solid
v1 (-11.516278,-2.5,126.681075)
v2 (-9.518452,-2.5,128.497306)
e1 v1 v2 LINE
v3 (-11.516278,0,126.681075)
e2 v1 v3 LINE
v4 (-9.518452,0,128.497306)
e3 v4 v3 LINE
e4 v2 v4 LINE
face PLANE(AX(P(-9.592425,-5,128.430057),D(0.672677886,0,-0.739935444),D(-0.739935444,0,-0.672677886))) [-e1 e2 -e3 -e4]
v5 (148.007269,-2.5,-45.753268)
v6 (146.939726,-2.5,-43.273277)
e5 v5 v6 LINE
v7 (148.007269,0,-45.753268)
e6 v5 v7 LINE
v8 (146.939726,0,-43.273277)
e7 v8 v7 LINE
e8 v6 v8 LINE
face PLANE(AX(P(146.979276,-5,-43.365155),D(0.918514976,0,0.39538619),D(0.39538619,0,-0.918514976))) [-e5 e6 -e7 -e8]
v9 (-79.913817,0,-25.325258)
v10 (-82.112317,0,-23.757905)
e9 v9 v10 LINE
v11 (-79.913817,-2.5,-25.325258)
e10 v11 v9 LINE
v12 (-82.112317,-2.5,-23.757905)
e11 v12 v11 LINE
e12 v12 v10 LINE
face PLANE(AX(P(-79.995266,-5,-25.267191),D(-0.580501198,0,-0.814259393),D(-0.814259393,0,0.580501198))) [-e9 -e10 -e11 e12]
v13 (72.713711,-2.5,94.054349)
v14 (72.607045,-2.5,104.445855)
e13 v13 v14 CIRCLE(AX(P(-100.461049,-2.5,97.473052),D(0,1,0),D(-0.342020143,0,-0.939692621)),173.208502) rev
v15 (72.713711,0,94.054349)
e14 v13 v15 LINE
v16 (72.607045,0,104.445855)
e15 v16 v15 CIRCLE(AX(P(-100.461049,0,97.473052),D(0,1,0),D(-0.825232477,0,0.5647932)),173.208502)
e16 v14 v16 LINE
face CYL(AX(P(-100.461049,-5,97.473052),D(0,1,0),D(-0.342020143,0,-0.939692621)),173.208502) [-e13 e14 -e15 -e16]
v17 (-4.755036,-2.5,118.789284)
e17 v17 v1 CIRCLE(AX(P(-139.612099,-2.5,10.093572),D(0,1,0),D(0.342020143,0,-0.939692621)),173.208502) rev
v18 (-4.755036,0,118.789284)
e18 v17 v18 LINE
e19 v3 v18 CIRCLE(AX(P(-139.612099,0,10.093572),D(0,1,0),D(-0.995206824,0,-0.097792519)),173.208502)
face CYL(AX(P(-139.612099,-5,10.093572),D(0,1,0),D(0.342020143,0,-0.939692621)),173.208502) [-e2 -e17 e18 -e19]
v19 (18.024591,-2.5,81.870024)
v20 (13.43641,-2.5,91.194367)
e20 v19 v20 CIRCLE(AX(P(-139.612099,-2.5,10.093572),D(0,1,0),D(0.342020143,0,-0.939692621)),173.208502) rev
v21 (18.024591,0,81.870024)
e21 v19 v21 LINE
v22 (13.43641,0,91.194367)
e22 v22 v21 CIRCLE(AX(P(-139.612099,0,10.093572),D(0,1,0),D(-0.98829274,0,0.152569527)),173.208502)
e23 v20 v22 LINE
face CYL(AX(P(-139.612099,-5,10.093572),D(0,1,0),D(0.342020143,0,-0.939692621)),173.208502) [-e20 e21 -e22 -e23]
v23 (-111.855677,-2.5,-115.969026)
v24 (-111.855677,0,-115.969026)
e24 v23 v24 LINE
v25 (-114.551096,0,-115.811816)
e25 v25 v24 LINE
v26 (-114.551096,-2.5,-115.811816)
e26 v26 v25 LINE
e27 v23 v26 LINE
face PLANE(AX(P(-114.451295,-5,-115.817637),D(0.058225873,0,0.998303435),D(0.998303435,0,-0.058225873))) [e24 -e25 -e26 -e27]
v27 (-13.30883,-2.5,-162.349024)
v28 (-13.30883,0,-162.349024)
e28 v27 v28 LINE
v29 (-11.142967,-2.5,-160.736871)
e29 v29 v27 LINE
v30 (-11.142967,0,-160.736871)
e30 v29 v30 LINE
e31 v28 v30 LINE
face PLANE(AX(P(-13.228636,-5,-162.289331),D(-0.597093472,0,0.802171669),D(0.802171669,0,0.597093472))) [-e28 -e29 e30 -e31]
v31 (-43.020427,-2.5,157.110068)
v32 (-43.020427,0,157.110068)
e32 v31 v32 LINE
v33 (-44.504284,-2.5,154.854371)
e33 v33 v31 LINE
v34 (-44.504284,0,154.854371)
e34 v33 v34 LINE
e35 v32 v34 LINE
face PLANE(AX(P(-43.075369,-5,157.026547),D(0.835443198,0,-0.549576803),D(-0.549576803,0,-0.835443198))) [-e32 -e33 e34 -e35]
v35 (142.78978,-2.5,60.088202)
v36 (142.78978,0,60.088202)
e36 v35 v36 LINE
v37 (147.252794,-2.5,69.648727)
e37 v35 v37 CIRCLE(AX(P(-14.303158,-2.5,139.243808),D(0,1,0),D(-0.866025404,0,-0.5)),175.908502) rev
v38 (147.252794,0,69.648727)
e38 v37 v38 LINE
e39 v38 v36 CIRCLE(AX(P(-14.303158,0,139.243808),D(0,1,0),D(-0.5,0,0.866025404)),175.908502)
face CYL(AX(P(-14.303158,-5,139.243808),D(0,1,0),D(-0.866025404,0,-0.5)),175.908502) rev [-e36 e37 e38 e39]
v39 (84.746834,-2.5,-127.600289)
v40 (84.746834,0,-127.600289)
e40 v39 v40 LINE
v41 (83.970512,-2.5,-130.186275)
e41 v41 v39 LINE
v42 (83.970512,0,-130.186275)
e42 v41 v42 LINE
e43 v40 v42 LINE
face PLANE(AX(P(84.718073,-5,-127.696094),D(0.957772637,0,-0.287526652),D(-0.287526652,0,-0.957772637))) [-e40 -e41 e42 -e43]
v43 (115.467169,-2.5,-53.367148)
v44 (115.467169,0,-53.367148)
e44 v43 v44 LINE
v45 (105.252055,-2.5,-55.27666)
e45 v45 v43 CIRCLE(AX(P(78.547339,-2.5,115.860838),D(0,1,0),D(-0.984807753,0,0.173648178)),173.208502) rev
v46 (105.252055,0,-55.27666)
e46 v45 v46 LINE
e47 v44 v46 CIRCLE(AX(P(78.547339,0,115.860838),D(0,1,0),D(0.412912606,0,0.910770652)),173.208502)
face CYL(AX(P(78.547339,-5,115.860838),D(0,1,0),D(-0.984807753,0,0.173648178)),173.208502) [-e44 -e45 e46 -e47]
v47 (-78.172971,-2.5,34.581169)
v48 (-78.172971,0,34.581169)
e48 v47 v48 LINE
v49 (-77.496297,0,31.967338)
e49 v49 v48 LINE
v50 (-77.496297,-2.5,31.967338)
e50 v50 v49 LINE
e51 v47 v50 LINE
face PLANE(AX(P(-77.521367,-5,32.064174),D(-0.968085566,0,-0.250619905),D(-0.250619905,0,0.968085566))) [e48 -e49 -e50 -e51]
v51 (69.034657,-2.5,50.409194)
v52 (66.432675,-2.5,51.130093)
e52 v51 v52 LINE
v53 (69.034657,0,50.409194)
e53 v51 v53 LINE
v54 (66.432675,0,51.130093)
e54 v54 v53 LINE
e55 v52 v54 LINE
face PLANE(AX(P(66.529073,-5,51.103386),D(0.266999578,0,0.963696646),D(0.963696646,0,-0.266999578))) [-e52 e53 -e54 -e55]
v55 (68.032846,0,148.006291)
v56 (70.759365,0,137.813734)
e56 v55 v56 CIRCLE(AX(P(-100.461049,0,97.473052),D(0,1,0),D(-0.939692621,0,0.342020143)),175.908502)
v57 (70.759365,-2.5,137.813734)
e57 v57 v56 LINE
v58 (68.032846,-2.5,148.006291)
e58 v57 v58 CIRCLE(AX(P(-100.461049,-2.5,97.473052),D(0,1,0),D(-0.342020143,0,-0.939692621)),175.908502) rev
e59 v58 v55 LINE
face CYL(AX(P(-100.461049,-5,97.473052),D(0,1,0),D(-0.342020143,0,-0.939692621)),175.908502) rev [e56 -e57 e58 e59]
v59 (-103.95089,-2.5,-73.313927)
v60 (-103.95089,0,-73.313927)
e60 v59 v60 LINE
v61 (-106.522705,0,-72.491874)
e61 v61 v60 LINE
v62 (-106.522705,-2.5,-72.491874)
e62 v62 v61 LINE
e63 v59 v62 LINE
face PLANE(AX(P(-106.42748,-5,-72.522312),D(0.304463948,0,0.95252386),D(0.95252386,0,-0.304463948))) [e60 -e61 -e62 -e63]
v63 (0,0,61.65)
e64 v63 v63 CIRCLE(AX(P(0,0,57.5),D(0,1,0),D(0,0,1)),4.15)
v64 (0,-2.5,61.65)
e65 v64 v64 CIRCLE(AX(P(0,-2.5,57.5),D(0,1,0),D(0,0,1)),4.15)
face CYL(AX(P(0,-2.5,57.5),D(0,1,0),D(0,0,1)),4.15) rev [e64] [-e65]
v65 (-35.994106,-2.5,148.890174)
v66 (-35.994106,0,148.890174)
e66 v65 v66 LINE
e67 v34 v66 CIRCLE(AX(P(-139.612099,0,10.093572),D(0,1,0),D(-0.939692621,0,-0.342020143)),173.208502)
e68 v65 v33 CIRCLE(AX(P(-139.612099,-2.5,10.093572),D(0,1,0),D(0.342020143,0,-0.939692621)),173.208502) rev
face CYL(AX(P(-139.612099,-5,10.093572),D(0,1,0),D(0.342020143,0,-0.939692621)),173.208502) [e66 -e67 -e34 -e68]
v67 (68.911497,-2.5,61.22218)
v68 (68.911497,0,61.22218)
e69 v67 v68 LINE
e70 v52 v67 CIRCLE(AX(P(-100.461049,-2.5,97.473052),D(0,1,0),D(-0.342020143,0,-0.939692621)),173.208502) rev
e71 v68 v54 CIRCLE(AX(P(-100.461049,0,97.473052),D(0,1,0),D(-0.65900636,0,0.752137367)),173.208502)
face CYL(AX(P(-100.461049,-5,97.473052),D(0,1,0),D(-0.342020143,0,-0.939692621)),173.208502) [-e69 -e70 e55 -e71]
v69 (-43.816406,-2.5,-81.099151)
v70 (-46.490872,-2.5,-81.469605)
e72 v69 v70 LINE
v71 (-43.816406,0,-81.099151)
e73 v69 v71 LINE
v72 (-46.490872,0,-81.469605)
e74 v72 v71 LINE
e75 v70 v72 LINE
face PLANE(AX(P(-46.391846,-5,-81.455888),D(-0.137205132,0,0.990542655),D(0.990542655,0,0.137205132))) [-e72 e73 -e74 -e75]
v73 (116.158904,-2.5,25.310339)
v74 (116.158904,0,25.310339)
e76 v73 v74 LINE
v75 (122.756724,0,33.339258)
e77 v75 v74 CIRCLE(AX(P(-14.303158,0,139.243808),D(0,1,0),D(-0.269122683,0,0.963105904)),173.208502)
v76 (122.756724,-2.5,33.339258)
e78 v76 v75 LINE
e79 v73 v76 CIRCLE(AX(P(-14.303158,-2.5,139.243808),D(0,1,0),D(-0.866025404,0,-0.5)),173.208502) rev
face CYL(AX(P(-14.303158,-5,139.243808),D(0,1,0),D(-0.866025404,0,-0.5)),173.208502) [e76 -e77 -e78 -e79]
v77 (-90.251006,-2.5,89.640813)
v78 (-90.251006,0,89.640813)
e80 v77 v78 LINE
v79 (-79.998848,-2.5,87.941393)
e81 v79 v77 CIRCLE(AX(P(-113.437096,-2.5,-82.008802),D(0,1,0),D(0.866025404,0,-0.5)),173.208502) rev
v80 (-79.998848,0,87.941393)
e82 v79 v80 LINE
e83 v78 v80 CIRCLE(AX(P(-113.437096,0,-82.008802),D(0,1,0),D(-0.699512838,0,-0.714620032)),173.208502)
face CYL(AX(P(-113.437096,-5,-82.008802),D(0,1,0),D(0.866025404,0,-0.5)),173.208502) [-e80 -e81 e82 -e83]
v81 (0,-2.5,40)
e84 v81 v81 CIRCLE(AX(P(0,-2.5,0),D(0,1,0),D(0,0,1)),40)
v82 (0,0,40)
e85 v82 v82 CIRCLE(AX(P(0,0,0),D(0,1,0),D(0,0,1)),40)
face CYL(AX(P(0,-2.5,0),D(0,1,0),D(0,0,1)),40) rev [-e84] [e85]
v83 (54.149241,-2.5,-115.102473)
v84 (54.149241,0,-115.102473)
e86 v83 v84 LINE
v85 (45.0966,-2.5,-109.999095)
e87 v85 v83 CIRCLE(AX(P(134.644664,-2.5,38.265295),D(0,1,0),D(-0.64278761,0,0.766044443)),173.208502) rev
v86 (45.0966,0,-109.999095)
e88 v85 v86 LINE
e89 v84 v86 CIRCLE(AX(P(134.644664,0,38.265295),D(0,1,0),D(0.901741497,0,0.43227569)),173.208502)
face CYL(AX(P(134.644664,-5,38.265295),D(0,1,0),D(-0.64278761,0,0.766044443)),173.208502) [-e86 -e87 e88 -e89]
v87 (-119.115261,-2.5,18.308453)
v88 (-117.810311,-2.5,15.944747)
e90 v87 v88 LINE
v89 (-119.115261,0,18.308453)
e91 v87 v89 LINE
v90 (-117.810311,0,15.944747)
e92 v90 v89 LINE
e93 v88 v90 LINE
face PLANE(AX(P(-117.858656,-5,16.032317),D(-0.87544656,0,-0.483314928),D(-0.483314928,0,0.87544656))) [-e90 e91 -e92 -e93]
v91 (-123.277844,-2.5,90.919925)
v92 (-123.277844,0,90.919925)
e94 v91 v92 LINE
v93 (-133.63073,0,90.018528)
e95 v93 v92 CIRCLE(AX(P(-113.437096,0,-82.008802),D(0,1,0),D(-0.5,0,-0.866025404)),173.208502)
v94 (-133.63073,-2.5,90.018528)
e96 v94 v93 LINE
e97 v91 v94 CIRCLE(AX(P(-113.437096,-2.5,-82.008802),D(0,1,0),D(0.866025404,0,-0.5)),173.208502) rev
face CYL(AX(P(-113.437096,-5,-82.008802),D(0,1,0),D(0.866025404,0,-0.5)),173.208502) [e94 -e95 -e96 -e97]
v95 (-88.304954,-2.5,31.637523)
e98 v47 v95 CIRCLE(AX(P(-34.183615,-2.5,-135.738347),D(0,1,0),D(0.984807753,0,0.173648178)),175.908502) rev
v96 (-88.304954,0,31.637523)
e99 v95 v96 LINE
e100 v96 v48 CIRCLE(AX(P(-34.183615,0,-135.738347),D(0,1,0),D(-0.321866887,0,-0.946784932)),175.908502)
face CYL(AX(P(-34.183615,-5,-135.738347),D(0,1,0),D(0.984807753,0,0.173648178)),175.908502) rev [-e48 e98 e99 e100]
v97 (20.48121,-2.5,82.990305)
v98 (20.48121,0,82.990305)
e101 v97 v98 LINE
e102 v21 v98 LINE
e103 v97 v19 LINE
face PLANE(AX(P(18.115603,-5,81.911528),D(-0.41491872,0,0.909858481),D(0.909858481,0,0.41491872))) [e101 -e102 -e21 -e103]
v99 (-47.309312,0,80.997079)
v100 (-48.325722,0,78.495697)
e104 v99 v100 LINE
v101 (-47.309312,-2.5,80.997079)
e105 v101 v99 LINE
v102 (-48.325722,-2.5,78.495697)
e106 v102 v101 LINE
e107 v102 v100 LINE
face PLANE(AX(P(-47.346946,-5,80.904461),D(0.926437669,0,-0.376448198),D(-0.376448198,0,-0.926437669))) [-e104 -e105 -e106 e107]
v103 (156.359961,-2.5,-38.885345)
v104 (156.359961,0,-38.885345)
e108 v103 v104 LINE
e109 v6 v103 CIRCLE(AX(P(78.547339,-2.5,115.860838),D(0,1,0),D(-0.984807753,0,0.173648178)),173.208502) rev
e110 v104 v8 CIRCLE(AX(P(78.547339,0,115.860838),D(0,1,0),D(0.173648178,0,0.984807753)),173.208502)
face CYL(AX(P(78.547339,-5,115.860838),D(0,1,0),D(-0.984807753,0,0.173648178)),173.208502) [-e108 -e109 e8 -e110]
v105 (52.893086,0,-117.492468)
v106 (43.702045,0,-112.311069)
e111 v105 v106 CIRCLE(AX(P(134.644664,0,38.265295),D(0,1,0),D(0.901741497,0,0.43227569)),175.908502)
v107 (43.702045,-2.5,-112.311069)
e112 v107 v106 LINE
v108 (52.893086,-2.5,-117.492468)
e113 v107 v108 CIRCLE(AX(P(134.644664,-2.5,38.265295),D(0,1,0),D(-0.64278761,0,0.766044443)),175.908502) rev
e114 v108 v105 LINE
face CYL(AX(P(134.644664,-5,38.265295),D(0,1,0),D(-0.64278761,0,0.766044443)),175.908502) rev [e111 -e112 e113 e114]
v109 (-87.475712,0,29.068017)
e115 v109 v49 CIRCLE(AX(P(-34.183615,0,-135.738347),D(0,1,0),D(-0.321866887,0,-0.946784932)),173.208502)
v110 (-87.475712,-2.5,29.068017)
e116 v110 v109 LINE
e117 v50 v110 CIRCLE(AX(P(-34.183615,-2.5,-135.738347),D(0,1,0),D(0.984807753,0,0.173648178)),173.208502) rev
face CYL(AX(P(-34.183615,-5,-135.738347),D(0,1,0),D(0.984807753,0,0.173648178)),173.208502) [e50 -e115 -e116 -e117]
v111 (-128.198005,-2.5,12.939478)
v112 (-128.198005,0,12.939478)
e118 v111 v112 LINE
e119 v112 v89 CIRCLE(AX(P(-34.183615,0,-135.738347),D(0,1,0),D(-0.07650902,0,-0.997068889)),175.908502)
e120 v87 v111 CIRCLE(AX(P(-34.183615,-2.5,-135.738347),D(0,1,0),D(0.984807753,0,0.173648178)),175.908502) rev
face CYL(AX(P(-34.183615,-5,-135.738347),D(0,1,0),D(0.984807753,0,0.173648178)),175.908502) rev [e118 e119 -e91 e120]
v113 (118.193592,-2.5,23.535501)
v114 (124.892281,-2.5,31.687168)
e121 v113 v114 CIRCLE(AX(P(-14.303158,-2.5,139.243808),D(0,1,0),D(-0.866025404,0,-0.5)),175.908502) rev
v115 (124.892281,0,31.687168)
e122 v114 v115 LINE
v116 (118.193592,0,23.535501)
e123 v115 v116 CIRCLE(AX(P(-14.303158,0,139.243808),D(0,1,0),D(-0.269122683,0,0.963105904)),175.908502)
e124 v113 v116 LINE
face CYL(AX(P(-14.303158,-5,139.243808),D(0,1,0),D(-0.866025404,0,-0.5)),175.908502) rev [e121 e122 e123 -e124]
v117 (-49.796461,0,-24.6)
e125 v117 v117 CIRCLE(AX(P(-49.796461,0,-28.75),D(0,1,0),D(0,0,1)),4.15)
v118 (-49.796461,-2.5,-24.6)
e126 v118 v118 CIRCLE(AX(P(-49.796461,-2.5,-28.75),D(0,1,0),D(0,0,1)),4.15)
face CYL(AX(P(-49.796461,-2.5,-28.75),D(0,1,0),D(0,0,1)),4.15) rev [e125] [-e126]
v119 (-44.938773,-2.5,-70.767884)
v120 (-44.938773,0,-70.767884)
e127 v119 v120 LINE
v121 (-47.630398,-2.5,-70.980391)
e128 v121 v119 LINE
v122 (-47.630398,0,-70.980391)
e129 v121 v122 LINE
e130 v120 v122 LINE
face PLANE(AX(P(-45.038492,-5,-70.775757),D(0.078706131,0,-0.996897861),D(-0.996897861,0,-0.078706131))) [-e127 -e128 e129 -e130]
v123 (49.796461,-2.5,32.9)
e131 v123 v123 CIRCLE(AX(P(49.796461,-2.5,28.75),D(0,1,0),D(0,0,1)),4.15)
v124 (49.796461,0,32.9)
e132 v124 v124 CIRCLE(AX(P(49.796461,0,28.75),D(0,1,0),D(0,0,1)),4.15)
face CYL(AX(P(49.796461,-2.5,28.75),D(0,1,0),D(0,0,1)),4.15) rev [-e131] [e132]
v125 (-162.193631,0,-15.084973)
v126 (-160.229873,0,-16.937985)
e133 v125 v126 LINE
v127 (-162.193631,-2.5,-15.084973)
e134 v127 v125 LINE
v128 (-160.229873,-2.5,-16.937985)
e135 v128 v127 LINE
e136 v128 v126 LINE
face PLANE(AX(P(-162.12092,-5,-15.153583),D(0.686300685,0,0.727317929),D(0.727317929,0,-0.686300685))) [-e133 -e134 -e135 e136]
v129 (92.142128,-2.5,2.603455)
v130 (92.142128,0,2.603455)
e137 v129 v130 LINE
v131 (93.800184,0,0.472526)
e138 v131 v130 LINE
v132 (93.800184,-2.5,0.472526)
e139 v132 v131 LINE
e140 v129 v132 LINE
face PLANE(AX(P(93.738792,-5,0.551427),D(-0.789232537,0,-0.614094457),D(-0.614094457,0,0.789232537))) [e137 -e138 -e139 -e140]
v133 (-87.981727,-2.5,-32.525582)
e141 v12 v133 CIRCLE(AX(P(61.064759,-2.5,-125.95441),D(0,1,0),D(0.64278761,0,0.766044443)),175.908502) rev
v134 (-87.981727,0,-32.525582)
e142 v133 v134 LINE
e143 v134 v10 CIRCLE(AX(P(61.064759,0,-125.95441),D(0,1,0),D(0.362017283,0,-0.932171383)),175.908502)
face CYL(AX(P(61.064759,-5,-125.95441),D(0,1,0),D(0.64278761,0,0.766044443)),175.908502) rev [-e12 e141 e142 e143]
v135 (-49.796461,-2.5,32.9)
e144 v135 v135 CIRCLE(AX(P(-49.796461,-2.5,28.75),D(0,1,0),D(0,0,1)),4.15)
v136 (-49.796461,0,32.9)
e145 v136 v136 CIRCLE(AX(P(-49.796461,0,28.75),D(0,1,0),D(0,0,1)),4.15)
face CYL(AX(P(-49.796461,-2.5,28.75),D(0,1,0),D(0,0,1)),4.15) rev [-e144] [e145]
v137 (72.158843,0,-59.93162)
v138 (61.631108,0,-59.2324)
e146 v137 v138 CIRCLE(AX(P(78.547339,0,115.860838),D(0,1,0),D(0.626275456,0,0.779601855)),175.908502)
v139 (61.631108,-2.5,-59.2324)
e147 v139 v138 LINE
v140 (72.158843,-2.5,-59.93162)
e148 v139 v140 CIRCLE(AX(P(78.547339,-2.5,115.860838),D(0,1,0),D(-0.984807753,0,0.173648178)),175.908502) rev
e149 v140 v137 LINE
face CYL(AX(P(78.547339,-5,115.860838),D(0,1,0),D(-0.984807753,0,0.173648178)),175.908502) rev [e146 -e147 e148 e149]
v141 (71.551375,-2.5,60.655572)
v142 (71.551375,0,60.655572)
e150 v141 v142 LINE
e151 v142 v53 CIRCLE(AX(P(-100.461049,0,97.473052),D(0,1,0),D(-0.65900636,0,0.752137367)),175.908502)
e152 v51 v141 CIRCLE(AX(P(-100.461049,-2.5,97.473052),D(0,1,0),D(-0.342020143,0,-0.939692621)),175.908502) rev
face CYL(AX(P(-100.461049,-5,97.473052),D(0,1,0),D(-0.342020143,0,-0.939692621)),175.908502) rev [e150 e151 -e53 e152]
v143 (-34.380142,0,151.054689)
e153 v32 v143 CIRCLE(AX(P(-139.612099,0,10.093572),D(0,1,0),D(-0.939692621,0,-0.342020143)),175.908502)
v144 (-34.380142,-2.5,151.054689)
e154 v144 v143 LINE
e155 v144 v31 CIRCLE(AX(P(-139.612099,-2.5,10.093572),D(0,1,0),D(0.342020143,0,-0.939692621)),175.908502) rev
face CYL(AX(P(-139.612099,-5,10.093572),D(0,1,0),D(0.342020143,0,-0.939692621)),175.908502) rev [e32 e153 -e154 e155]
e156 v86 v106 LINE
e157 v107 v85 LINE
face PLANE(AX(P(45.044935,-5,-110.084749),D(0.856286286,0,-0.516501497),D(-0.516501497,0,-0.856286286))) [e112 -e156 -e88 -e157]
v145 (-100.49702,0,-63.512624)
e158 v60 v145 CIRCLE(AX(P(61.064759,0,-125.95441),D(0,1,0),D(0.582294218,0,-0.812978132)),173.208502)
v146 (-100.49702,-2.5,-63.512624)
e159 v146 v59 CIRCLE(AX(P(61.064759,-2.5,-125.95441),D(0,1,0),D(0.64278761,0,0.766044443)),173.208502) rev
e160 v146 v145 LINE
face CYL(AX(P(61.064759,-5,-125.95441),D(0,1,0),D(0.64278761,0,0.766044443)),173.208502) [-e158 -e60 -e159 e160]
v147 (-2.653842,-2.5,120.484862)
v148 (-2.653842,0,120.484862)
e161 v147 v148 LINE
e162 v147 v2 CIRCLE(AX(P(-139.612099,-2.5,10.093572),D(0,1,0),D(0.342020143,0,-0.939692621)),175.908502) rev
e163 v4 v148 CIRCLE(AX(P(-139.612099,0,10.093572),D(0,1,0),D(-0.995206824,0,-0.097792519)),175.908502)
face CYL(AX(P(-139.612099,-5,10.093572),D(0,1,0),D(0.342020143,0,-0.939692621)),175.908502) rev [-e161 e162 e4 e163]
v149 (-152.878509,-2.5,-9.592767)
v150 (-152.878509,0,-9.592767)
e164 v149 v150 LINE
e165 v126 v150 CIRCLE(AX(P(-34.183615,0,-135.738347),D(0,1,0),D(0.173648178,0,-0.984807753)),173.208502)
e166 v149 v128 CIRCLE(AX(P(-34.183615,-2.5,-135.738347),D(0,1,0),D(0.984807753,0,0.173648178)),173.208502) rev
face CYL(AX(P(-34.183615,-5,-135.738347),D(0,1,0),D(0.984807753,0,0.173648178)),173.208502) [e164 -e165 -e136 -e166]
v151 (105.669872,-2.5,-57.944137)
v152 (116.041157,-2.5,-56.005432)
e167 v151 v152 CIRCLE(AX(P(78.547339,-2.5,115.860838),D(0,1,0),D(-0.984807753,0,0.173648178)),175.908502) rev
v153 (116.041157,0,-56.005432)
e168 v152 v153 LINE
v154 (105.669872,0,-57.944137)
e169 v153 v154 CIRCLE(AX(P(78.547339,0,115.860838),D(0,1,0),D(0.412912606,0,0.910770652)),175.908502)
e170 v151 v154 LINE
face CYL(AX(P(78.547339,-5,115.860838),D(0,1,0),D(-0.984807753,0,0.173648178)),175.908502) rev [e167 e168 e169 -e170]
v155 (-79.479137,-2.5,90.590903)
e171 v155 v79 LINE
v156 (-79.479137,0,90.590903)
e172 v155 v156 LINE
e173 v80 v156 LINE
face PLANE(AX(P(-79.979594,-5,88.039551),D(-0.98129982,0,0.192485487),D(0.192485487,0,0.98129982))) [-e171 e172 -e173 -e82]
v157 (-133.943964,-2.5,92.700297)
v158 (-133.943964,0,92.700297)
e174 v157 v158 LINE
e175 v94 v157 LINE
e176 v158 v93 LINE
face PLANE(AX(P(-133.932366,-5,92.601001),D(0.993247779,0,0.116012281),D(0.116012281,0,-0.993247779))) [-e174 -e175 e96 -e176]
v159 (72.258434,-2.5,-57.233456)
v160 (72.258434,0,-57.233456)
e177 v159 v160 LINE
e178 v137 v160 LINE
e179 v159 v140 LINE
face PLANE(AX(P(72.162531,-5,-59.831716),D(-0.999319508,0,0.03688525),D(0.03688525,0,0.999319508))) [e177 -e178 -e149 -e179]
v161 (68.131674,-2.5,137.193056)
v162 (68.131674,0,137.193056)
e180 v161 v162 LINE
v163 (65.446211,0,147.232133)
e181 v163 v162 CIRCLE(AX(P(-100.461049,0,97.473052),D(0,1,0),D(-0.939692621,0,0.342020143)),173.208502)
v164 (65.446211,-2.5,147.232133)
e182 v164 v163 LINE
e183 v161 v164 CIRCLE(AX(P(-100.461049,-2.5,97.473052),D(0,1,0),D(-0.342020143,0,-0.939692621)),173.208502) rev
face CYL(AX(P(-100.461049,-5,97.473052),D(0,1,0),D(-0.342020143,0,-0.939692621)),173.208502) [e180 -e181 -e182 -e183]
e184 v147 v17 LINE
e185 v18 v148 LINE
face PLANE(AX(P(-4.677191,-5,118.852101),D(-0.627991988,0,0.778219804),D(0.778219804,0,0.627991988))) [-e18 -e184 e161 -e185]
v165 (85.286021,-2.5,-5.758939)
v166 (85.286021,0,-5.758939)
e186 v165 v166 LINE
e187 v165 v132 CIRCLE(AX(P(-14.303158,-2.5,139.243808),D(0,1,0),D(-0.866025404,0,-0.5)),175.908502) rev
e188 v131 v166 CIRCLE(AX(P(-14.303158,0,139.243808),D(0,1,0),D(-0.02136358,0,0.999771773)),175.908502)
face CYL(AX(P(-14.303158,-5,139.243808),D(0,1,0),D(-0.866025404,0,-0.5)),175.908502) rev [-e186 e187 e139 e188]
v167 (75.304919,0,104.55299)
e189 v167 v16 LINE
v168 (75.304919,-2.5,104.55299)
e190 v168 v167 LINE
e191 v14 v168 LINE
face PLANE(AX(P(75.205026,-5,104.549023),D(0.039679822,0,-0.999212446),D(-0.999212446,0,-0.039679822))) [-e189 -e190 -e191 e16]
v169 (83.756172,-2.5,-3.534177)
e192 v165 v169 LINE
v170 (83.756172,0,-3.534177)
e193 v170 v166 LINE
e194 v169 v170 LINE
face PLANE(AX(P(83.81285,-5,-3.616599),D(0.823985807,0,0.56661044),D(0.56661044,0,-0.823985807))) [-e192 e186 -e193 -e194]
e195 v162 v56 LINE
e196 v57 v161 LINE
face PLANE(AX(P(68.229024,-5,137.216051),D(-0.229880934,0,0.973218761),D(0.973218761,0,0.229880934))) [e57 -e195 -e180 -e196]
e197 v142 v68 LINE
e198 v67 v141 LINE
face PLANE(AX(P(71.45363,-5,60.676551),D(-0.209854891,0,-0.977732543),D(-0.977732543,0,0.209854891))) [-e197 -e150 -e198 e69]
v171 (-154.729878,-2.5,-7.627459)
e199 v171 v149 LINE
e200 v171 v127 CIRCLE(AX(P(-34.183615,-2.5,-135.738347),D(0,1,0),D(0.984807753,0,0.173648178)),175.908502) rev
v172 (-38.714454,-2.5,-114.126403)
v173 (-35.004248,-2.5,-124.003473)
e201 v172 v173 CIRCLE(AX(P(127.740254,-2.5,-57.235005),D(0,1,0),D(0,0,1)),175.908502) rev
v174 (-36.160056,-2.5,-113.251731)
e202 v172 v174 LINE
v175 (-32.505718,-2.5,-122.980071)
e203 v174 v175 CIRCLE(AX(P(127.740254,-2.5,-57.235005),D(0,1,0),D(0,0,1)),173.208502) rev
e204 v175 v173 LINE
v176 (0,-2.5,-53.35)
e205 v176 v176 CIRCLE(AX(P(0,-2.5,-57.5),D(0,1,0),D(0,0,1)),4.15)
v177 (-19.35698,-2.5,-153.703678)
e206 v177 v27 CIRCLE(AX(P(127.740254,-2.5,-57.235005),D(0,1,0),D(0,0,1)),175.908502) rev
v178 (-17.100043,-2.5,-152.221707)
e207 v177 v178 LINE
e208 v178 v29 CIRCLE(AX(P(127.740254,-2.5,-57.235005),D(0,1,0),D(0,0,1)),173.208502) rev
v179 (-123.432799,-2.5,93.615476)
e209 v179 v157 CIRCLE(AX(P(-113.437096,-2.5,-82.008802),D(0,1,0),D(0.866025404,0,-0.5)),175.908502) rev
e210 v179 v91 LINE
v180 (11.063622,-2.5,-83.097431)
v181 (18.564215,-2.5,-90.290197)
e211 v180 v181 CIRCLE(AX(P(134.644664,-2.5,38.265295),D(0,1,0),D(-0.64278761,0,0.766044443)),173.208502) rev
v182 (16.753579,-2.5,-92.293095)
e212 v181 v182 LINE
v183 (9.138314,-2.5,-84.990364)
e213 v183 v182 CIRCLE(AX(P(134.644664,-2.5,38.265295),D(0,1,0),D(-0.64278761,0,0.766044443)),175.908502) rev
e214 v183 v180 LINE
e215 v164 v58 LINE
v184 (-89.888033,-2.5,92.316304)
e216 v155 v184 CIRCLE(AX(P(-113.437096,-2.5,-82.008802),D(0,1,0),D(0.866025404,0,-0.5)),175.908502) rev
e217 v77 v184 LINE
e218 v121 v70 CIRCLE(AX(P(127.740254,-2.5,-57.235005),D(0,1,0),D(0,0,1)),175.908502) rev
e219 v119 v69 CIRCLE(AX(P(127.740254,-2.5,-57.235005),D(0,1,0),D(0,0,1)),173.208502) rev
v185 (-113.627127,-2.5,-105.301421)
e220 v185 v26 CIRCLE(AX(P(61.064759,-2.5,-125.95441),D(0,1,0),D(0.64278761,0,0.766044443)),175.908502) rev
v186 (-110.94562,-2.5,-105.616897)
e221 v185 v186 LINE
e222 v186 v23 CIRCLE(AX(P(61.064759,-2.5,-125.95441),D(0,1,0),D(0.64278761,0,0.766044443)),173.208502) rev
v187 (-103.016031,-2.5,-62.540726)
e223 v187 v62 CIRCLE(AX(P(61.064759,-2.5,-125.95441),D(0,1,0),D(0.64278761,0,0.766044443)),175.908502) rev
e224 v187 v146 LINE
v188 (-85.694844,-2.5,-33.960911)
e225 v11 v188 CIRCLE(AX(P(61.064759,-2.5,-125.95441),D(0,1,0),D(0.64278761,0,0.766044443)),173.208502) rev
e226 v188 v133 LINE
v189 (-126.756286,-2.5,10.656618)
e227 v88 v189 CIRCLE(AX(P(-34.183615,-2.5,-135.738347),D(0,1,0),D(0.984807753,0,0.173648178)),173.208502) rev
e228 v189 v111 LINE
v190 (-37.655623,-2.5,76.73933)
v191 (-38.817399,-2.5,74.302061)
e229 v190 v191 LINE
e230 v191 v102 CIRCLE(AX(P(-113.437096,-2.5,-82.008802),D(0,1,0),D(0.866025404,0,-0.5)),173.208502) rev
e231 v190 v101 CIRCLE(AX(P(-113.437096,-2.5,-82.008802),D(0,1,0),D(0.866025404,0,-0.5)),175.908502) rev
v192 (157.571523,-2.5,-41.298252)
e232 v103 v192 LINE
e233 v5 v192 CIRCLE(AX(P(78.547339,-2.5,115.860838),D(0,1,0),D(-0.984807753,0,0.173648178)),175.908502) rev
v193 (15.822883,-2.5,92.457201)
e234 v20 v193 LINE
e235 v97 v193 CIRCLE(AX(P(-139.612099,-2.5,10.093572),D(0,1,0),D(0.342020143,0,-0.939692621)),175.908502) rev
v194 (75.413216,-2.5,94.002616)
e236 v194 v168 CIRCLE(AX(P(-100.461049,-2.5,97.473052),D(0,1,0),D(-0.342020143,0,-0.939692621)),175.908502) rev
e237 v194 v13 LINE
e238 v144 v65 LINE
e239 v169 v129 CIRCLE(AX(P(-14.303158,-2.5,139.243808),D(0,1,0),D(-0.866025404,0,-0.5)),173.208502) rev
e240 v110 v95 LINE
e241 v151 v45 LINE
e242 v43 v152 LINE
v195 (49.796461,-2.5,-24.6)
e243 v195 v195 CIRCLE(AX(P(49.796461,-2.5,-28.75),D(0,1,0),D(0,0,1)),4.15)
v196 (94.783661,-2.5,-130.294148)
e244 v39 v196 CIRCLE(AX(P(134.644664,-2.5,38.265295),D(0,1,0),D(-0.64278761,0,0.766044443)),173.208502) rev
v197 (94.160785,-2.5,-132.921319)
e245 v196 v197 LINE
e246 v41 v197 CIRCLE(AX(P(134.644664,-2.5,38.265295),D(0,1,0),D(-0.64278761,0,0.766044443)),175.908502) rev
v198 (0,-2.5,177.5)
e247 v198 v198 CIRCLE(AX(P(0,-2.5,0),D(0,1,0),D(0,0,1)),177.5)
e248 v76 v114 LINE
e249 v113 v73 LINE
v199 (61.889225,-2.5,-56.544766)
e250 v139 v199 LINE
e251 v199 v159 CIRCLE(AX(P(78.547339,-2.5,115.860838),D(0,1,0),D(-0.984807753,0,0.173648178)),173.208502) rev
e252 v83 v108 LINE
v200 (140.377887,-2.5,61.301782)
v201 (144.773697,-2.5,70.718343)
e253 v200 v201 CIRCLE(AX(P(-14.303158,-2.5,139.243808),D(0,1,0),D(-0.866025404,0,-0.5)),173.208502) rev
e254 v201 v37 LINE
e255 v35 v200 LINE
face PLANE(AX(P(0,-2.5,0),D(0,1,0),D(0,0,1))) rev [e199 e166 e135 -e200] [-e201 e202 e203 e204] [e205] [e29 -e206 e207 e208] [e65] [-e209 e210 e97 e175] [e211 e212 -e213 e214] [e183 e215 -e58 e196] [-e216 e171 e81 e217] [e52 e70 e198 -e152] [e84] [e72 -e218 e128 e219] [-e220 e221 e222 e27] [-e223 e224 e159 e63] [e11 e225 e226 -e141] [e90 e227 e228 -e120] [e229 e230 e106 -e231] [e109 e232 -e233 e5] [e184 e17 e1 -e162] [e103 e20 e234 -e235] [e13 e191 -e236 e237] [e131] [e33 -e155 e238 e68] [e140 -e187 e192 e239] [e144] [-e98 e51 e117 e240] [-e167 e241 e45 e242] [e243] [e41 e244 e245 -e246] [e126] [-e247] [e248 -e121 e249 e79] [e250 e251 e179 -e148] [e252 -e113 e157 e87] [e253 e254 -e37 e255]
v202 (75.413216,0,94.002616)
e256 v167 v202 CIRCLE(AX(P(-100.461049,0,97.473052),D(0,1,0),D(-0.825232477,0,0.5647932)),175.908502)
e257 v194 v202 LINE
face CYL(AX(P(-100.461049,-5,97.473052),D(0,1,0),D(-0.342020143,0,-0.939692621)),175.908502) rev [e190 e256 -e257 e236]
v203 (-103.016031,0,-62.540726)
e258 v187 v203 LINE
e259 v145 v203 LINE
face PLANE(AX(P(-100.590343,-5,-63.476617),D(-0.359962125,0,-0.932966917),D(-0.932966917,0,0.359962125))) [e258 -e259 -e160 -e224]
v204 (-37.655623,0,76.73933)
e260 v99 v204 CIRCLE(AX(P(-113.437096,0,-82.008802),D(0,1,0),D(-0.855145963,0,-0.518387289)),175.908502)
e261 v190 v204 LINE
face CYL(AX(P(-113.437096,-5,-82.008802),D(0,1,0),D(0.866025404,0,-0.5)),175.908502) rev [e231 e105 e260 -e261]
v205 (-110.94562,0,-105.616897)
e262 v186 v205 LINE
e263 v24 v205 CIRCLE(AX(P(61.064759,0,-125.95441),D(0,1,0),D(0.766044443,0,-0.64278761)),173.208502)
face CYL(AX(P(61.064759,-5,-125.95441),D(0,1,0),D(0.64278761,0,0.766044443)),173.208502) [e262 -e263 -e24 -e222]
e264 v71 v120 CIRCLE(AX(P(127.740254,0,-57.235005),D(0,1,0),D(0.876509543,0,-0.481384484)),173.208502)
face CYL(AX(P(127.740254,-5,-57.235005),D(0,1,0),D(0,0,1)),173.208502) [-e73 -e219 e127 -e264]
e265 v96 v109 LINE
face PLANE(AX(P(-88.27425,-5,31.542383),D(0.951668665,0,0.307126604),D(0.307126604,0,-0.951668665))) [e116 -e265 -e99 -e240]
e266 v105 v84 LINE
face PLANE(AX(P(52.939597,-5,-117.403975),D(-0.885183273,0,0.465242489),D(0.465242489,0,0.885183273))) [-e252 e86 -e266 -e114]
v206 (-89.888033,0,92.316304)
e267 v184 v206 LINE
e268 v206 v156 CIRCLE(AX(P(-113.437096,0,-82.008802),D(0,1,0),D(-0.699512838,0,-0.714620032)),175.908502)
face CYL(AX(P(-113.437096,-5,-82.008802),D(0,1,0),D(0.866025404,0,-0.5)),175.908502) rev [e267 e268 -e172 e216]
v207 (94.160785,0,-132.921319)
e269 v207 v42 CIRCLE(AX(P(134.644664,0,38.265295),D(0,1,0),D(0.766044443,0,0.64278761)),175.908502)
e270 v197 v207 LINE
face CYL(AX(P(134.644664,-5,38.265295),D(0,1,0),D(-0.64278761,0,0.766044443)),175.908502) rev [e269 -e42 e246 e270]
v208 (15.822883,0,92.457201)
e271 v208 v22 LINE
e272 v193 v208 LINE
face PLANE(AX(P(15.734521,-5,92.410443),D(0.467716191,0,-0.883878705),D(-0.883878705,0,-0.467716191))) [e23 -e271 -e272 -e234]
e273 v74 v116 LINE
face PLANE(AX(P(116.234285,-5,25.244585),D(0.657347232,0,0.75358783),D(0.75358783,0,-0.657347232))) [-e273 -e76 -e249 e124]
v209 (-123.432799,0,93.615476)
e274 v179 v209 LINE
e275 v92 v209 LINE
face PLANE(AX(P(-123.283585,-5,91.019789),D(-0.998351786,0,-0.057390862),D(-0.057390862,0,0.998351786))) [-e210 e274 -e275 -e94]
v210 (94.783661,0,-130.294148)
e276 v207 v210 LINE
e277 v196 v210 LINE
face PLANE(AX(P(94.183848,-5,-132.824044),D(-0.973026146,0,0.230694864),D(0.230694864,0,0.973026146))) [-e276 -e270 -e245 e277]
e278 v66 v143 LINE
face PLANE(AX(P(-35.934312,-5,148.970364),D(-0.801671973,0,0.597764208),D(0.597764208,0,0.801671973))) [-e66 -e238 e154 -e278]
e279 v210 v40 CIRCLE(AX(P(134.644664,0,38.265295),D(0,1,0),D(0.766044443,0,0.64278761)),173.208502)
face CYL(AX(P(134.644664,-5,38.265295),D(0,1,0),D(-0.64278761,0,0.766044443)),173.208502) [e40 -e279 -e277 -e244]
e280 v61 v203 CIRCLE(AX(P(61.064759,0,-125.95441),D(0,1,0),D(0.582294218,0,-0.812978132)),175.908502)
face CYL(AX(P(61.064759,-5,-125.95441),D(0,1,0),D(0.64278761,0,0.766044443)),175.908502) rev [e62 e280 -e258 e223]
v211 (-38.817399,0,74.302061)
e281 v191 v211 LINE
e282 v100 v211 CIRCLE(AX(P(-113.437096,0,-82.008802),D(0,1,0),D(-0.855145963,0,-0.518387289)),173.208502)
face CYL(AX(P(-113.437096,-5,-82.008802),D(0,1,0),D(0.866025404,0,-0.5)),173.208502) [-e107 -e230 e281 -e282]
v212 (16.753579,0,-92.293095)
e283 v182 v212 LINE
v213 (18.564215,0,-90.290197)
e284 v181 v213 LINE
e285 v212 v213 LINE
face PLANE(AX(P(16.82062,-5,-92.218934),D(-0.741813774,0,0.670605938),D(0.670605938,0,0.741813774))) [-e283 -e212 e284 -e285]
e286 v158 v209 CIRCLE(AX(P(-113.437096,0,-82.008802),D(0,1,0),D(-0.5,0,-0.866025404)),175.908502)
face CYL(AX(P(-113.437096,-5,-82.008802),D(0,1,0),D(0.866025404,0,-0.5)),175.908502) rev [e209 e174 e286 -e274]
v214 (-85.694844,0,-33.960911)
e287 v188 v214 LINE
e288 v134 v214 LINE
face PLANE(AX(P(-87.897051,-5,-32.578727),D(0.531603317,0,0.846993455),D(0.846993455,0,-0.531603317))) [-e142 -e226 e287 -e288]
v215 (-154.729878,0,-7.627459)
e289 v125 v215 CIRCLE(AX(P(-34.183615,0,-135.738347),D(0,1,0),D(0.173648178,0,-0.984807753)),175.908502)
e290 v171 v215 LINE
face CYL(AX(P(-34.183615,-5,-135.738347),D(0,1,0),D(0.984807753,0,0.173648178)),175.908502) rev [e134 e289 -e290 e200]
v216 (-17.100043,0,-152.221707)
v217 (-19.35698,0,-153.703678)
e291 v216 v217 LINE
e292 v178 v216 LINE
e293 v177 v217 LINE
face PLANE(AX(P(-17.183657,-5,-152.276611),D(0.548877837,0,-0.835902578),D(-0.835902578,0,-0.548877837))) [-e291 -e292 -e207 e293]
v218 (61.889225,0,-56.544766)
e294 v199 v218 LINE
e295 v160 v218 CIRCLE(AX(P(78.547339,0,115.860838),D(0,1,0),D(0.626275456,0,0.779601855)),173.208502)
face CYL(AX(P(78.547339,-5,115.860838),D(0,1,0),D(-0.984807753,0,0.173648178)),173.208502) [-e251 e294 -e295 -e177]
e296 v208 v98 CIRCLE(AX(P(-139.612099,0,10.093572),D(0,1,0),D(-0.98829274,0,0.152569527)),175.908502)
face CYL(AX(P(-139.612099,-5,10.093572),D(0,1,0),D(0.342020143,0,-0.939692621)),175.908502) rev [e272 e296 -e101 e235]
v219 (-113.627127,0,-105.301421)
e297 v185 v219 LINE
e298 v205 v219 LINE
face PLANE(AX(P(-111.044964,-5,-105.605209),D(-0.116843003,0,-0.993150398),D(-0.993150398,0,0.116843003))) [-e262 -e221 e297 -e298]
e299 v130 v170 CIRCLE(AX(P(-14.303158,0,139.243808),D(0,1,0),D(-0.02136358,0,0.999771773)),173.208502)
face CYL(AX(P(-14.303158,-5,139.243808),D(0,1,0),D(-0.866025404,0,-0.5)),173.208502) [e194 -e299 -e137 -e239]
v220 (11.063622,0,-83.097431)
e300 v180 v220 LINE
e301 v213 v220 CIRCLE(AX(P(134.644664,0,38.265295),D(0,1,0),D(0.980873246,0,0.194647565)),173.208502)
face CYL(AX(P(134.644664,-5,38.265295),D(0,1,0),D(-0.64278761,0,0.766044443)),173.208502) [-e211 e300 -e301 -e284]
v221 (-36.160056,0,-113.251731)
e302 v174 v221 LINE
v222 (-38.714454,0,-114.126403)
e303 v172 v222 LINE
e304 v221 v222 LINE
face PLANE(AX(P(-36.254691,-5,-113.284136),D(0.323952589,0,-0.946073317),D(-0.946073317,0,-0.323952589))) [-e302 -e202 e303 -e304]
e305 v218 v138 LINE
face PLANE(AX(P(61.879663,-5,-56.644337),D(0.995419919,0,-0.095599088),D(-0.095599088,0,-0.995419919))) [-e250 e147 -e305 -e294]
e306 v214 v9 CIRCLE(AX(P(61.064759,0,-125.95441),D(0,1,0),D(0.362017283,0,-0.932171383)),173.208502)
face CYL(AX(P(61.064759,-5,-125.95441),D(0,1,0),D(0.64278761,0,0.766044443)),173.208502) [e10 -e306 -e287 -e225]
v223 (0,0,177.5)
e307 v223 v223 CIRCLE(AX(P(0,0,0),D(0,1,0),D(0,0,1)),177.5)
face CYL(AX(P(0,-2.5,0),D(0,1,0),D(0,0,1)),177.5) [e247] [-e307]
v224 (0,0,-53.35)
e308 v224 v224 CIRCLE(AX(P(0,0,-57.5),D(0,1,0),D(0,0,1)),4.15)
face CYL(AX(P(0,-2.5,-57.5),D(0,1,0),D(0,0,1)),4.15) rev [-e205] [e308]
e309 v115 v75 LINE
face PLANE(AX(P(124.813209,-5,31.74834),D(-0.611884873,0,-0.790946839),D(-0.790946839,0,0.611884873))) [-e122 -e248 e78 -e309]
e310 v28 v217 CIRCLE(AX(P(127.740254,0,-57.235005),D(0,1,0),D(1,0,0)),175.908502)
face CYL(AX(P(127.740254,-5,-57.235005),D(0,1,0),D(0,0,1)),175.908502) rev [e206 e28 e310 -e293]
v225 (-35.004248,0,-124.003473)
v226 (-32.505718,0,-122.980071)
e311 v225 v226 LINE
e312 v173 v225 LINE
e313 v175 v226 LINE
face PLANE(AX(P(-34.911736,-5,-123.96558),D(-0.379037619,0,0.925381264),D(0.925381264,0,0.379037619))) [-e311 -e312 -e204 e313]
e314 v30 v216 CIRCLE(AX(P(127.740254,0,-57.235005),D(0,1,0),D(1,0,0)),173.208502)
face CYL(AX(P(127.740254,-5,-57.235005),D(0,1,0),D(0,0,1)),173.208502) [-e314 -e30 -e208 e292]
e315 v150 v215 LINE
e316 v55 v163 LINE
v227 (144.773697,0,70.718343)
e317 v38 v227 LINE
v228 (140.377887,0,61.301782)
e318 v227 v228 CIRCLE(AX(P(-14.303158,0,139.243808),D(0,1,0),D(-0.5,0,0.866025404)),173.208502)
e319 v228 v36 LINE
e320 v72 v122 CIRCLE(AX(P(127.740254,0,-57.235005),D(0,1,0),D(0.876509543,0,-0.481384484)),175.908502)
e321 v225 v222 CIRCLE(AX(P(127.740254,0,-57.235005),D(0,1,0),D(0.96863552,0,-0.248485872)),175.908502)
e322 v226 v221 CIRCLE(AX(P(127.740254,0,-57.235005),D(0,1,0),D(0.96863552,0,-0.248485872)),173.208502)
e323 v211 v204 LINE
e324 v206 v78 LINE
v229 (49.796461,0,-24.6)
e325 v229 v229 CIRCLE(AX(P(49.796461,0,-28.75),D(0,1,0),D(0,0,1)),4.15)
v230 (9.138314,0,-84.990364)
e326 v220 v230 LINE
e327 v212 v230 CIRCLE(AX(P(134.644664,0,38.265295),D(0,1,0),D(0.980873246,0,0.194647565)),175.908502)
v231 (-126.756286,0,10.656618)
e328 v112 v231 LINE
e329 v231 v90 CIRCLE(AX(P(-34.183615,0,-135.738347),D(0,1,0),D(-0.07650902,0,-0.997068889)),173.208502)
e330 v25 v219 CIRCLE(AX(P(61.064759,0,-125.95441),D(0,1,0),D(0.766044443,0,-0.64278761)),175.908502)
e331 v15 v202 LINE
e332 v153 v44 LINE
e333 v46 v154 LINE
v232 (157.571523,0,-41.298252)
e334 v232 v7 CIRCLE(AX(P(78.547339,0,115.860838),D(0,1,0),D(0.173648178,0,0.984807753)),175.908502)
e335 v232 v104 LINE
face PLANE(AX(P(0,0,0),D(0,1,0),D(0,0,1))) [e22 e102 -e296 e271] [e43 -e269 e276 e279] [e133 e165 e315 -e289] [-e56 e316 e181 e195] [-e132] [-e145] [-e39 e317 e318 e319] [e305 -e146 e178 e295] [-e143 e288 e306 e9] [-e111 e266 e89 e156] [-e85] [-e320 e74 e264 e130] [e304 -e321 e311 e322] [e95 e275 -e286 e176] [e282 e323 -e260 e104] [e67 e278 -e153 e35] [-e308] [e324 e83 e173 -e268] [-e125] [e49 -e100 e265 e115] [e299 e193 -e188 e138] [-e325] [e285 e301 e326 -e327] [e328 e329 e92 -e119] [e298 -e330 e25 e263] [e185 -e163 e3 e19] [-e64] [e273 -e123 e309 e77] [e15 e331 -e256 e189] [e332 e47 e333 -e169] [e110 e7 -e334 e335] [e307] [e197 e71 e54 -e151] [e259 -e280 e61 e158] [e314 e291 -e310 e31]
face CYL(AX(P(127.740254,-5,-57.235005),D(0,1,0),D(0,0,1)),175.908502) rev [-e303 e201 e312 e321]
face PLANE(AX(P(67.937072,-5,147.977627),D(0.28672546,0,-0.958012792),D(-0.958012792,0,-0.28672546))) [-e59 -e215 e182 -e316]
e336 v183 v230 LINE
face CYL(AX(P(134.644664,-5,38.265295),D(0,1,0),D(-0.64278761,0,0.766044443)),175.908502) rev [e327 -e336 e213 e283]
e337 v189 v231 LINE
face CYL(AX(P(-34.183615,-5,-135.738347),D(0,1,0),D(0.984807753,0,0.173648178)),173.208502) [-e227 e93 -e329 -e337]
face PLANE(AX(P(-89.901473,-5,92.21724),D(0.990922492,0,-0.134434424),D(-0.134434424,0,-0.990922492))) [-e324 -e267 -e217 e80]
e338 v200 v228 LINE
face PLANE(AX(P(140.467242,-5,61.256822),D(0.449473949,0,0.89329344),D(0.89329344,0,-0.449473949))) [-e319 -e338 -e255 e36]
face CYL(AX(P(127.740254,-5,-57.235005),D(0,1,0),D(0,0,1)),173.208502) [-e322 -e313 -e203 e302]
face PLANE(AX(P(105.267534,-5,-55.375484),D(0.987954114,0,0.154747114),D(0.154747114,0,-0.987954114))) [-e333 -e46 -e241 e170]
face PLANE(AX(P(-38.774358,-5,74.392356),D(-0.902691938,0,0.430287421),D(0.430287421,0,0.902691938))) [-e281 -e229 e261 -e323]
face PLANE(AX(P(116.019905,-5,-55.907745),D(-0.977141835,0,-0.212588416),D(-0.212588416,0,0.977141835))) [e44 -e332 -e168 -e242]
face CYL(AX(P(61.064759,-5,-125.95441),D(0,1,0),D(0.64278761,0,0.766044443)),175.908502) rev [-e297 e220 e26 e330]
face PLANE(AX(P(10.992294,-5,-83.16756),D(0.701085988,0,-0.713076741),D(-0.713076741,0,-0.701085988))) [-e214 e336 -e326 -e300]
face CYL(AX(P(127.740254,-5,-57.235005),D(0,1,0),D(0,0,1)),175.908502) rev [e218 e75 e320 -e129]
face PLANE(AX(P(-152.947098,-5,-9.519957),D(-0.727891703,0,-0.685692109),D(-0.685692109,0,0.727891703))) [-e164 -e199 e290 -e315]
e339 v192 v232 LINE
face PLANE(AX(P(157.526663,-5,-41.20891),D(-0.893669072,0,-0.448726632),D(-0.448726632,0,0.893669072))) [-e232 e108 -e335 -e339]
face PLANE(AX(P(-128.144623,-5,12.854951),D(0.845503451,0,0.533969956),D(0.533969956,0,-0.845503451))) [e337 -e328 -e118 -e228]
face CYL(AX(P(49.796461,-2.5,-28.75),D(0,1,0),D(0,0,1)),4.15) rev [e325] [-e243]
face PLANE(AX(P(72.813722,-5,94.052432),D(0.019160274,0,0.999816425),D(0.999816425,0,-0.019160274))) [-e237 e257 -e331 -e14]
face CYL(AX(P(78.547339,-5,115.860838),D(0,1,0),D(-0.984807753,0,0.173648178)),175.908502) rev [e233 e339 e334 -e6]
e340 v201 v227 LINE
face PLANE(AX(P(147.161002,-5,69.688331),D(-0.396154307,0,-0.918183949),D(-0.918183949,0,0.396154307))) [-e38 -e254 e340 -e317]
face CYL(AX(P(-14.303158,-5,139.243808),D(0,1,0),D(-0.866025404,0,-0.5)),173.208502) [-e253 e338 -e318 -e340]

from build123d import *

# Parameters (mm, degrees)
SKETCH2_R                = 177.5
SKETCH2_R_2              = 40
SKETCH2_R_3              = 4.15
BASE_FLANGE1_DEPTH       = 2.5
TAB_START                = -2.5
TAB_AND_SLOT_SLOT1_DEPTH = 2.5
CIRPATTERN1_COUNT        = 9


# Read off the part's stored shape, not the designer's step: Tab and Slot-Slot1
# Sheet-metal steps are written as plain solids
with BuildPart() as part:
    # Sketch2 → Base-Flange1 (new body)
    with BuildSketch(Plane(origin=(0, 0, 0), x_dir=(1, 0, 0), z_dir=(0, 1, 0))):
        with Locations(Location((0, 0, 0), (0, 0, 270))):
            Circle(SKETCH2_R)
        with Locations(Location((0, 0, 0), (0, 0, 270))):
            Circle(SKETCH2_R_2, mode=Mode.SUBTRACT)
        with Locations(Location((0, 57.5, 0), (0, 0, 270))):
            Circle(SKETCH2_R_3, mode=Mode.SUBTRACT)
        with Locations(Location((49.796460718, 28.75, 0), (0, 0, 270))):
            Circle(SKETCH2_R_3, mode=Mode.SUBTRACT)
        with Locations(Location((49.796460718, -28.75, 0), (0, 0, 270))):
            Circle(SKETCH2_R_3, mode=Mode.SUBTRACT)
        with Locations(Location((0, -57.5, 0), (0, 0, 270))):
            Circle(SKETCH2_R_3, mode=Mode.SUBTRACT)
        with Locations(Location((-49.796460718, -28.75, 0), (0, 0, 270))):
            Circle(SKETCH2_R_3, mode=Mode.SUBTRACT)
        with Locations(Location((-49.796460718, 28.75, 0), (0, 0, 270))):
            Circle(SKETCH2_R_3, mode=Mode.SUBTRACT)
    extrude(amount=-BASE_FLANGE1_DEPTH)

    # Tab and Slot-Slot1 outline → Tab and Slot-Slot1 (cut)
    with BuildSketch(Plane(origin=(0, 0, 0), x_dir=(1, 0, 0), z_dir=(0, 1, 0)).offset(TAB_START)):
        with BuildLine():
            Line((-19.35698036, 153.703677576), (-17.100043029, 152.221707173))
            ThreePointArc((-17.100043029, 152.221707173), (-14.185380107, 156.523975279), (-11.142966591, 160.736871053))
            Line((-11.142966591, 160.736871053), (-13.308830451, 162.349023691))
            ThreePointArc((-13.308830451, 162.349023691), (-16.397738089, 158.071706572), (-19.35698036, 153.703677576))
        make_face()
        with BuildLine():
            ThreePointArc((-36.160055897, 113.251731275), (-34.405862702, 118.143313538), (-32.505717981, 122.980070804))
            Line((-32.505717981, 122.980070804), (-35.004247803, 124.003472544))
            ThreePointArc((-35.004247803, 124.003472544), (-36.933420587, 119.092761343), (-38.714454271, 114.126403408))
            Line((-38.714454271, 114.126403408), (-36.160055897, 113.251731275))
        make_face()
        with BuildLine():
            ThreePointArc((-44.938772946, 70.767884474), (-44.45508819, 75.941937031), (-43.816406366, 81.09915104))
            Line((-43.816406366, 81.09915104), (-46.490871974, 81.469604956))
            ThreePointArc((-46.490871974, 81.469604956), (-47.139294904, 76.233543475), (-47.630397611, 70.980391064))
            Line((-47.630397611, 70.980391064), (-44.938772946, 70.767884474))
        make_face()
    tab_and_slot_slot1 = extrude(amount=TAB_AND_SLOT_SLOT1_DEPTH, mode=Mode.SUBTRACT)

    # CirPattern1: Tab and Slot-Slot1 ×9 about axis
    cirpattern1_axis = Axis((0, 0, 0), (0, 1, 0))
    for i in range(1, CIRPATTERN1_COUNT):
        add(tab_and_slot_slot1.rotate(cirpattern1_axis, i * 360 / CIRPATTERN1_COUNT), mode=Mode.SUBTRACT)


solid = part.part
